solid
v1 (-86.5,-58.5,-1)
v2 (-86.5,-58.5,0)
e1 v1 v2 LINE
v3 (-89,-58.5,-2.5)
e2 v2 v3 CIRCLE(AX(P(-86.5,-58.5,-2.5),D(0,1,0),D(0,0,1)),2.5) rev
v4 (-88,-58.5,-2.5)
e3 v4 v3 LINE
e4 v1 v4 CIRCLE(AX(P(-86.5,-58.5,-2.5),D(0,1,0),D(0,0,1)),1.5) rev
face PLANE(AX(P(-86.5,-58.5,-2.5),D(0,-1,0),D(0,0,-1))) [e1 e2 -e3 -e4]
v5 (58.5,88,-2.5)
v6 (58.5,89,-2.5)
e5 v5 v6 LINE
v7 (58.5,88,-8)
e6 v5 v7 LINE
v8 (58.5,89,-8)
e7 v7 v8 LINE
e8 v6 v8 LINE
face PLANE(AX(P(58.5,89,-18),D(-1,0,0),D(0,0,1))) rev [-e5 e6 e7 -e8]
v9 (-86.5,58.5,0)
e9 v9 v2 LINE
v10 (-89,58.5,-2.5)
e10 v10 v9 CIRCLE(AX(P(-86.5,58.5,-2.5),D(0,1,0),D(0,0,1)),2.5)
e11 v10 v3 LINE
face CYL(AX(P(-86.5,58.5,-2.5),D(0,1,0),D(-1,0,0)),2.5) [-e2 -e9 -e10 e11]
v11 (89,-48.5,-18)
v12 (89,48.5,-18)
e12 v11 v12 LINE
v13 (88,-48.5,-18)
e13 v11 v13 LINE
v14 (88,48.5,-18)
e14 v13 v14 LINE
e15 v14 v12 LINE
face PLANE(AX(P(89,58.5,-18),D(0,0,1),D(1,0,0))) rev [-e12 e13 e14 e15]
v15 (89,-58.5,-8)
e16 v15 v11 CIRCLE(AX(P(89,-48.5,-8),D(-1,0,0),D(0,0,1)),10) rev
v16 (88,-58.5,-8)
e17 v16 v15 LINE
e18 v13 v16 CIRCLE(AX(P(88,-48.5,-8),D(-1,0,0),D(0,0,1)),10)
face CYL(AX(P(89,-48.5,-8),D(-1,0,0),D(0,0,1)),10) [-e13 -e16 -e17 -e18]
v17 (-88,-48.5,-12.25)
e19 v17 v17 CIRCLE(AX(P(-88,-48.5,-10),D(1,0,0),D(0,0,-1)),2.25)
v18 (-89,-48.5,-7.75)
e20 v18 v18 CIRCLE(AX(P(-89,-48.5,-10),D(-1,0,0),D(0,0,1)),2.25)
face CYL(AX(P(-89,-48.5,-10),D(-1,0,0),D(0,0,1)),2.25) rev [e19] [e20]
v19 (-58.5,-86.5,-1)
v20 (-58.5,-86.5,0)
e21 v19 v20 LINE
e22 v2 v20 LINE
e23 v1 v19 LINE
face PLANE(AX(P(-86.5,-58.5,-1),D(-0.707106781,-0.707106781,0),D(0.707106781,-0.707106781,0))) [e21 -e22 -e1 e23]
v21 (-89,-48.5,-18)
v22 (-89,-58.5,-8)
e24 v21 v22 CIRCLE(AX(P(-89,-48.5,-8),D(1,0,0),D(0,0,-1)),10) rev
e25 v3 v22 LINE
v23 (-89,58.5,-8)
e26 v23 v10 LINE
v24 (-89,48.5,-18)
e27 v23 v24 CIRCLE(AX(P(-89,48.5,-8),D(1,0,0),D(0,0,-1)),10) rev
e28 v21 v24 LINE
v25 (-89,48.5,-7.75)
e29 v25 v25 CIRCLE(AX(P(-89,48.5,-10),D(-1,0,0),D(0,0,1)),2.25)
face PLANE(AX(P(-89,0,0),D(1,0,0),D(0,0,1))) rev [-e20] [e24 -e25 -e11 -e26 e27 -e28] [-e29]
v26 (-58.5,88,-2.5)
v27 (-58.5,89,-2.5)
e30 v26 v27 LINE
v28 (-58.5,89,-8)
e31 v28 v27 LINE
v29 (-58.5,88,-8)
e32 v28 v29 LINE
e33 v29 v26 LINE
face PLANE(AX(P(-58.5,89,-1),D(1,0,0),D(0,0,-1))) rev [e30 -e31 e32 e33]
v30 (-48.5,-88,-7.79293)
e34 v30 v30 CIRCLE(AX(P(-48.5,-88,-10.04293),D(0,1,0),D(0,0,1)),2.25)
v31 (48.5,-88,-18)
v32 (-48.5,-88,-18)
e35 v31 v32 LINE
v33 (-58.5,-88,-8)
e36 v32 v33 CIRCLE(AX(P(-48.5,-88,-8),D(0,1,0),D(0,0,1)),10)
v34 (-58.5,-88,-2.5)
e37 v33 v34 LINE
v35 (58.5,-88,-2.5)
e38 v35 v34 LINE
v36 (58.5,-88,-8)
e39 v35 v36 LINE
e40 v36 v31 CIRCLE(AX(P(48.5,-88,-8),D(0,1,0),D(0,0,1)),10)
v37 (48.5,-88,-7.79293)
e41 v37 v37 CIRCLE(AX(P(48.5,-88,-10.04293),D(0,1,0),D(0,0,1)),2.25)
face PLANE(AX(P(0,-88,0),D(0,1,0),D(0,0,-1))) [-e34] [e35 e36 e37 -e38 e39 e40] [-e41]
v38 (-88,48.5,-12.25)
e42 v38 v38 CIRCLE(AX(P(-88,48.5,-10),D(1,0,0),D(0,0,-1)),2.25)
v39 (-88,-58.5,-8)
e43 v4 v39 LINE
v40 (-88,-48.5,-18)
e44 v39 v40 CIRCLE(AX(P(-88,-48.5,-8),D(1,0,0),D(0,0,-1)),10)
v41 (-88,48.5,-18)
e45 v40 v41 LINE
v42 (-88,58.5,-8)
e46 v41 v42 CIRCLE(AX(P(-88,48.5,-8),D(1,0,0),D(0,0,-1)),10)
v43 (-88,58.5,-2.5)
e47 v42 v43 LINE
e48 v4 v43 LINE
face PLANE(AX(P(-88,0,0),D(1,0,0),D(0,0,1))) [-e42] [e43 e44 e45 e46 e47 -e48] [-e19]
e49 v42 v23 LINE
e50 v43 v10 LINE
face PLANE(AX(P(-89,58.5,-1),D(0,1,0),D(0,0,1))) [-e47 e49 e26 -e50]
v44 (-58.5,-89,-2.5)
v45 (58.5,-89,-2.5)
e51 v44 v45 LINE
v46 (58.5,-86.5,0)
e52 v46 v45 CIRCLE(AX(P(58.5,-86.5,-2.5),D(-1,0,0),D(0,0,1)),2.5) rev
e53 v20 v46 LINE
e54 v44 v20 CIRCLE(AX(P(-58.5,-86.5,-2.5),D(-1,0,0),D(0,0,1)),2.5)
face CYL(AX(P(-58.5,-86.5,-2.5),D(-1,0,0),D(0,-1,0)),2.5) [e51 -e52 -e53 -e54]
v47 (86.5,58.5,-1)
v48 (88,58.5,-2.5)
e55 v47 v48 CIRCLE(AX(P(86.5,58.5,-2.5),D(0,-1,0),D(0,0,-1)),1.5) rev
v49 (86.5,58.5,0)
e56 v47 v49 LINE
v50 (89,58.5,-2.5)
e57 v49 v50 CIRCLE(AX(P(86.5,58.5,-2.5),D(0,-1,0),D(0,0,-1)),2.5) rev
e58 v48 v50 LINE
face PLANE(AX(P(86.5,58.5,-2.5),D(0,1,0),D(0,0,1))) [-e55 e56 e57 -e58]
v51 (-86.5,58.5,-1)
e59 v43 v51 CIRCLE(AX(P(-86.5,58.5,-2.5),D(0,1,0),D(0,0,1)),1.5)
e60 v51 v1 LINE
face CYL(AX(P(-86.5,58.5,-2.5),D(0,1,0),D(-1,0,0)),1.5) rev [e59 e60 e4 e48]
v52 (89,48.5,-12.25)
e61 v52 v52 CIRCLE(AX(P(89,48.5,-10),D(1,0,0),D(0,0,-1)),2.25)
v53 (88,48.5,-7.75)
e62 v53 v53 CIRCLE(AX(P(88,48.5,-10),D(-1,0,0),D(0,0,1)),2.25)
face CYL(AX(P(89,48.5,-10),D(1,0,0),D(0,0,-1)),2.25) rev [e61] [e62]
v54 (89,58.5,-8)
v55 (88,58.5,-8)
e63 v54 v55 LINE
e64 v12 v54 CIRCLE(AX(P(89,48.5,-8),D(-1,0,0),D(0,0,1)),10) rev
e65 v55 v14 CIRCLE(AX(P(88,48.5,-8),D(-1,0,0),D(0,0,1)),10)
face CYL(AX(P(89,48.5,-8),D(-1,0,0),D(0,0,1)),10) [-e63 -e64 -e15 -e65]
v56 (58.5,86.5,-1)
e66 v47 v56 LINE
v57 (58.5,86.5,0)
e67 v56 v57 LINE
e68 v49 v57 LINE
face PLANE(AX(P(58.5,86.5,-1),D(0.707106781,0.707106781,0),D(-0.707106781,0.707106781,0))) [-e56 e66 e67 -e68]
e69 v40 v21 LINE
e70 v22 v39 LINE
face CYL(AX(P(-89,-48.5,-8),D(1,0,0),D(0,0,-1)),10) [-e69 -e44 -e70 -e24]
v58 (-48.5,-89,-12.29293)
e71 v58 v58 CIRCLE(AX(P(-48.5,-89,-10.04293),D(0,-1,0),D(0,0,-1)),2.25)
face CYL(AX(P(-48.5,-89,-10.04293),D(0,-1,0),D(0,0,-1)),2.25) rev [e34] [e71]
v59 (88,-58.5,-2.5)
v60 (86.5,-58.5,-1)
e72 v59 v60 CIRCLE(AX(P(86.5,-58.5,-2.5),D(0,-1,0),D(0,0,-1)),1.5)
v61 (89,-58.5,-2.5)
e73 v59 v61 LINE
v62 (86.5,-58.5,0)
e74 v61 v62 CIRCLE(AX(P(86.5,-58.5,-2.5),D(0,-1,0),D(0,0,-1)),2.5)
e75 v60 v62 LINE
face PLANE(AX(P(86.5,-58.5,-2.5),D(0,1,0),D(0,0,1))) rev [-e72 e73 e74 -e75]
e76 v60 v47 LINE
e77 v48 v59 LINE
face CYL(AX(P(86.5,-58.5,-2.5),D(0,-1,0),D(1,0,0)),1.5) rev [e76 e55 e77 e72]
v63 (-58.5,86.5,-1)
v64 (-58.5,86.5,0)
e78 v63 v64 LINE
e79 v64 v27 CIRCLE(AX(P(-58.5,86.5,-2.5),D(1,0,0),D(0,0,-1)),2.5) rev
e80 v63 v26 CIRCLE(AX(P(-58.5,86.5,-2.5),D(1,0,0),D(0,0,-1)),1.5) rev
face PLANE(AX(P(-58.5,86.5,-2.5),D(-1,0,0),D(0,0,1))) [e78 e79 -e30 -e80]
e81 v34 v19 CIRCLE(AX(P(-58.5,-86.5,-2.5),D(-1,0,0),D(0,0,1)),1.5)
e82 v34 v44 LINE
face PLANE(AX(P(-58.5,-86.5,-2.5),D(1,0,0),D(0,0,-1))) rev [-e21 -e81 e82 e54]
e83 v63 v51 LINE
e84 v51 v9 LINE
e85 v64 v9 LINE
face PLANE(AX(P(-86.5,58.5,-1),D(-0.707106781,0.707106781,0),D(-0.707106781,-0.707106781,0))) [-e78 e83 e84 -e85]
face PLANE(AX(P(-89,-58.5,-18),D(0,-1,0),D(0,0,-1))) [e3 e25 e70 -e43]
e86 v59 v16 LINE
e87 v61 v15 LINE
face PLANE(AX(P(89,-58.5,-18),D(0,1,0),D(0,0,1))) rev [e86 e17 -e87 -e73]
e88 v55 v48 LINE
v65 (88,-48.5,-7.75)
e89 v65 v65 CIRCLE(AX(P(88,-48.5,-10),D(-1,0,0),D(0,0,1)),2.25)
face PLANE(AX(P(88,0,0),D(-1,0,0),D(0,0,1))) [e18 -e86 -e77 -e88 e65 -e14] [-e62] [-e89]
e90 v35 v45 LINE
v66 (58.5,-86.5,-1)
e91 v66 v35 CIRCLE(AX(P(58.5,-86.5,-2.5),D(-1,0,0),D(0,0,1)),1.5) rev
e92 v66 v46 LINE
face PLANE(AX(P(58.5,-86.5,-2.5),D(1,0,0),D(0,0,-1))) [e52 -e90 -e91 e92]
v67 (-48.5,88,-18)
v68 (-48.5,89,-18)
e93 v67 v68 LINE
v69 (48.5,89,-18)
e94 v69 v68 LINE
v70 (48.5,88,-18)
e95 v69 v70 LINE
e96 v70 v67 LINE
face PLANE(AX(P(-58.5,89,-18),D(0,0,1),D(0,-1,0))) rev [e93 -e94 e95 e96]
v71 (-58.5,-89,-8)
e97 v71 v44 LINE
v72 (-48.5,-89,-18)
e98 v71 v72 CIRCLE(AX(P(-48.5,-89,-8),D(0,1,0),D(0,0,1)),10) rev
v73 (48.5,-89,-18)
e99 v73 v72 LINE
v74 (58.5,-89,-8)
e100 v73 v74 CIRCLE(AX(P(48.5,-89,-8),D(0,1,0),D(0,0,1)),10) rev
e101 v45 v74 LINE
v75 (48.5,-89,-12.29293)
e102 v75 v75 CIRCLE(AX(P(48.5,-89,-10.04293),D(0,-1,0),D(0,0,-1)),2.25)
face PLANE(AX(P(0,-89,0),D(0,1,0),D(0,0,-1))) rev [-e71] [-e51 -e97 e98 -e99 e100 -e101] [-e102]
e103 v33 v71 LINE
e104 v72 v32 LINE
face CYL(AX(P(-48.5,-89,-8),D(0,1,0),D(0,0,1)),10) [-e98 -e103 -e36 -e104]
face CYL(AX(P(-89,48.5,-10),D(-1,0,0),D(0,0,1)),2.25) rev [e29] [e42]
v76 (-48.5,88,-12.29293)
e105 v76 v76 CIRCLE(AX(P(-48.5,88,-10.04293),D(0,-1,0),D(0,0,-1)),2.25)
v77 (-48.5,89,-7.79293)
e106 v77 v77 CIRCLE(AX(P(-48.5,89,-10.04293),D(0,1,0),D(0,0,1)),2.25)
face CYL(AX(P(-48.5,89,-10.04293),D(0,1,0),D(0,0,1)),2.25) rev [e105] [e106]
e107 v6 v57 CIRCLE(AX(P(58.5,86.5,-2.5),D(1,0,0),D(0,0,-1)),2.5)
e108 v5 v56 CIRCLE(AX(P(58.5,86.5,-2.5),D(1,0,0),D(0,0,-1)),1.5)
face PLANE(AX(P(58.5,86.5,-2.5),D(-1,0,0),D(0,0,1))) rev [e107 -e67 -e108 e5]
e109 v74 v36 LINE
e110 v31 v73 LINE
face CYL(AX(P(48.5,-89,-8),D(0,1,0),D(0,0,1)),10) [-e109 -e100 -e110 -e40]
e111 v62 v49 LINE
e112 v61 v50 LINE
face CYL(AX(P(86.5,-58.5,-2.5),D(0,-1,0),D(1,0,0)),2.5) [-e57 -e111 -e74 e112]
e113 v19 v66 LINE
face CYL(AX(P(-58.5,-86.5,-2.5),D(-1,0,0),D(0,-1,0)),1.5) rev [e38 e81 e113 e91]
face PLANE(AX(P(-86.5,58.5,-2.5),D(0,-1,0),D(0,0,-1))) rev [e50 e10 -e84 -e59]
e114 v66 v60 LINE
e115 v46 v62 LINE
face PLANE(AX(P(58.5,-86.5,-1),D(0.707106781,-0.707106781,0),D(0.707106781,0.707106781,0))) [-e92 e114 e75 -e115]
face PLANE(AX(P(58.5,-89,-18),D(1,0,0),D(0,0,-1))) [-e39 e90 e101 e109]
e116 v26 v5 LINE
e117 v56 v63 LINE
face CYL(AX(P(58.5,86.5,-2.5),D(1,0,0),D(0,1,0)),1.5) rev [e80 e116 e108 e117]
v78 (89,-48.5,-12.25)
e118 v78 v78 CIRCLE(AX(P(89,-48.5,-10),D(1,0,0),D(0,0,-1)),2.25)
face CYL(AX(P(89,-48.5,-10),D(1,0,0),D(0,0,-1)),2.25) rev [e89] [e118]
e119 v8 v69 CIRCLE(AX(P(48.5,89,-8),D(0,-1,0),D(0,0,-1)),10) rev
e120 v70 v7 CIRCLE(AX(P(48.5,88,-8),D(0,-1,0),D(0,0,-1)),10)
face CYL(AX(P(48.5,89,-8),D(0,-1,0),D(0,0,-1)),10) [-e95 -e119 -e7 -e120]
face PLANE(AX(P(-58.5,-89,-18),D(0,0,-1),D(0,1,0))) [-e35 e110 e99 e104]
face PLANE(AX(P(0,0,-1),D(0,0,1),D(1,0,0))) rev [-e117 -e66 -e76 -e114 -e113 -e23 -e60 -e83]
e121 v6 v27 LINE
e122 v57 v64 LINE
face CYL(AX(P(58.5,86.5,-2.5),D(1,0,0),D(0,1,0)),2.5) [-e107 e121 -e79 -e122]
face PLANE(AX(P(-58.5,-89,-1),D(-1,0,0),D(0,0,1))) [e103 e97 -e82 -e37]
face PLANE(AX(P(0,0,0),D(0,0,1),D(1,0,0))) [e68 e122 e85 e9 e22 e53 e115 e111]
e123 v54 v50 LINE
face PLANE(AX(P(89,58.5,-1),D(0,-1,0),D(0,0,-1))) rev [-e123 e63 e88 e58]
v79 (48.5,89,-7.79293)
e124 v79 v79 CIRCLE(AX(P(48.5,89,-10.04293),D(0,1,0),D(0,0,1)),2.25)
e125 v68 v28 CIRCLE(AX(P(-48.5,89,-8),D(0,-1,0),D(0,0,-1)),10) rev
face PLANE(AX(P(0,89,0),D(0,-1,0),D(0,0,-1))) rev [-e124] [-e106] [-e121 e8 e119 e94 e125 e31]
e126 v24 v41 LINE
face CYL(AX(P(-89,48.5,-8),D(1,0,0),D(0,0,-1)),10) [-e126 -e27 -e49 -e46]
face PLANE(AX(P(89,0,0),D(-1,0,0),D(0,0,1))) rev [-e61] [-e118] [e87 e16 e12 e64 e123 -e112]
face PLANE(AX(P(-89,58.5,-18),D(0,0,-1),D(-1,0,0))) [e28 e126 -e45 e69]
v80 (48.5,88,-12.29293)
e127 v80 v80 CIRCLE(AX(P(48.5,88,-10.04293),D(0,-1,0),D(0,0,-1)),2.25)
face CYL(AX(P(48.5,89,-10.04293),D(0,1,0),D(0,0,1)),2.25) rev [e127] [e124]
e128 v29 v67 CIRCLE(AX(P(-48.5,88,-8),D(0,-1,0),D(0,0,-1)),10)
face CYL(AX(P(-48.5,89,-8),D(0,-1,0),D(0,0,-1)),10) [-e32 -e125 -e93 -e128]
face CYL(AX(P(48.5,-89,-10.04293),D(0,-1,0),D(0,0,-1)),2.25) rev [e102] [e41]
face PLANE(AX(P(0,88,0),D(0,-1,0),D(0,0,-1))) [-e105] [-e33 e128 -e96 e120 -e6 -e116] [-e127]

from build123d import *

# Parameters (mm, degrees)
MAIN_PLATE_DEPTH                       = 1
HORI_EDGE_DEPTH                        = 117
HORI_EDGE_FILLETS_R                    = 10
M4_CLEARANCE_HOLE1_D                   = 4.5
M4_CLEARANCE_HOLE1_DEPTH               = 178
VERT_EDGE_DEPTH                        = 117
VERT_EDGE_FILLETS_R                    = 10
M4_CLEARANCE_HOLE2_D                   = 4.5
M4_CLEARANCE_HOLE2_DEPTH               = 178
HORI_EDGE_FILLETS_OF_OTHER_HORI_EDGE_R = 10
VERT_EDGE_FILLETS_OF_OTHER_VERT_EDGE_R = 10


# Sheet-metal steps are written as plain solids
with BuildPart() as part:
    # Sketch1 → Main Plate (new body)
    with BuildSketch(Plane.XY):
        Polygon((-86.5, -58.5), (-58.5, -86.5), (58.5, -86.5), (86.5, -58.5), (86.5, 58.5), (58.5, 86.5), (-58.5, 86.5), (-86.5, 58.5), align=None)
    extrude(amount=-MAIN_PLATE_DEPTH)

    # Hori Edge section (across the edge) → Hori Edge (add)
    with BuildSketch(Plane(origin=(-58.5, 88, -1), x_dir=(0, -1, 0), z_dir=(1, 0, 0))):
        with BuildLine():
            Line((-1, 1.5), (-1, 17))
            Line((-1, 17), (0, 17))
            Line((0, 17), (0, 1.5))
            ThreePointArc((0, 1.5), (0.439339828, 0.439339828), (1.5, 0))
            Line((1.5, 0), (1.5, -1))
            ThreePointArc((1.5, -1), (-0.267766953, -0.267766953), (-1, 1.5))
        make_face()
    hori_edge = extrude(amount=HORI_EDGE_DEPTH)

    # Hori Edge Fillets
    hori_edge_fillets_edges = [part.edges().sort_by_distance(p)[0] for p in [
        (-58.5, 88.5, -18),
        (58.5, 88.5, -18),
    ]]
    fillet(hori_edge_fillets_edges, radius=HORI_EDGE_FILLETS_R)

    # M4 Clearance Hole1
    with Locations(Plane(origin=(0, 89, 0), x_dir=(1, 0, 0), z_dir=(0, 1, 0))):
        with Locations((-48.5, 10.042929808), (48.5, 10.042929808)):
            m4_clearance_hole1 = Hole(M4_CLEARANCE_HOLE1_D / 2, depth=M4_CLEARANCE_HOLE1_DEPTH)

    # Vert Edge section (across the edge) → Vert Edge (add)
    with BuildSketch(Plane(origin=(88, 58.5, -1), x_dir=(-1, 0, 0), z_dir=(0, -1, 0))):
        with BuildLine():
            Line((-1, 1.5), (-1, 17))
            Line((-1, 17), (0, 17))
            Line((0, 17), (0, 1.5))
            ThreePointArc((0, 1.5), (0.439339828, 0.439339828), (1.5, 0))
            Line((1.5, 0), (1.5, -1))
            ThreePointArc((1.5, -1), (-0.267766953, -0.267766953), (-1, 1.5))
        make_face()
    vert_edge = extrude(amount=VERT_EDGE_DEPTH)

    # Vert Edge Fillets
    vert_edge_fillets_edges = [part.edges().sort_by_distance(p)[0] for p in [
        (88.5, 58.5, -18),
        (88.5, -58.5, -18),
    ]]
    fillet(vert_edge_fillets_edges, radius=VERT_EDGE_FILLETS_R)

    # M4 Clearance Hole2
    with Locations(Plane(origin=(89, 0, 0), x_dir=(0, 0, -1), z_dir=(1, 0, 0))):
        with Locations((10, 48.5), (10, -48.5)):
            m4_clearance_hole2 = Hole(M4_CLEARANCE_HOLE2_D / 2, depth=M4_CLEARANCE_HOLE2_DEPTH)

    # Other Hori Edge: Hori Edge, M4 Clearance Hole1 across plane
    add(hori_edge.mirror(Plane.ZX))
    add(m4_clearance_hole1.mirror(Plane.ZX), mode=Mode.SUBTRACT)

    # Hori Edge Fillets of Other Hori Edge
    hori_edge_fillets_of_other_hori_edge_edges = [part.edges().sort_by_distance(p)[0] for p in [
        (-58.5, -88.5, -18),
        (58.5, -88.5, -18),
    ]]
    fillet(hori_edge_fillets_of_other_hori_edge_edges, radius=HORI_EDGE_FILLETS_OF_OTHER_HORI_EDGE_R)

    # Other Vert Edge: Vert Edge, M4 Clearance Hole2 across plane
    add(vert_edge.mirror(Plane(origin=(0, 0, 0), x_dir=(0, 0, 1), z_dir=(1, 0, 0))))
    add(m4_clearance_hole2.mirror(Plane(origin=(0, 0, 0), x_dir=(0, 0, 1), z_dir=(1, 0, 0))), mode=Mode.SUBTRACT)

    # Vert Edge Fillets of Other Vert Edge
    vert_edge_fillets_of_other_vert_edge_edges = [part.edges().sort_by_distance(p)[0] for p in [
        (-88.5, 58.5, -18),
        (-88.5, -58.5, -18),
    ]]
    fillet(vert_edge_fillets_of_other_vert_edge_edges, radius=VERT_EDGE_FILLETS_OF_OTHER_VERT_EDGE_R)


solid = part.part
